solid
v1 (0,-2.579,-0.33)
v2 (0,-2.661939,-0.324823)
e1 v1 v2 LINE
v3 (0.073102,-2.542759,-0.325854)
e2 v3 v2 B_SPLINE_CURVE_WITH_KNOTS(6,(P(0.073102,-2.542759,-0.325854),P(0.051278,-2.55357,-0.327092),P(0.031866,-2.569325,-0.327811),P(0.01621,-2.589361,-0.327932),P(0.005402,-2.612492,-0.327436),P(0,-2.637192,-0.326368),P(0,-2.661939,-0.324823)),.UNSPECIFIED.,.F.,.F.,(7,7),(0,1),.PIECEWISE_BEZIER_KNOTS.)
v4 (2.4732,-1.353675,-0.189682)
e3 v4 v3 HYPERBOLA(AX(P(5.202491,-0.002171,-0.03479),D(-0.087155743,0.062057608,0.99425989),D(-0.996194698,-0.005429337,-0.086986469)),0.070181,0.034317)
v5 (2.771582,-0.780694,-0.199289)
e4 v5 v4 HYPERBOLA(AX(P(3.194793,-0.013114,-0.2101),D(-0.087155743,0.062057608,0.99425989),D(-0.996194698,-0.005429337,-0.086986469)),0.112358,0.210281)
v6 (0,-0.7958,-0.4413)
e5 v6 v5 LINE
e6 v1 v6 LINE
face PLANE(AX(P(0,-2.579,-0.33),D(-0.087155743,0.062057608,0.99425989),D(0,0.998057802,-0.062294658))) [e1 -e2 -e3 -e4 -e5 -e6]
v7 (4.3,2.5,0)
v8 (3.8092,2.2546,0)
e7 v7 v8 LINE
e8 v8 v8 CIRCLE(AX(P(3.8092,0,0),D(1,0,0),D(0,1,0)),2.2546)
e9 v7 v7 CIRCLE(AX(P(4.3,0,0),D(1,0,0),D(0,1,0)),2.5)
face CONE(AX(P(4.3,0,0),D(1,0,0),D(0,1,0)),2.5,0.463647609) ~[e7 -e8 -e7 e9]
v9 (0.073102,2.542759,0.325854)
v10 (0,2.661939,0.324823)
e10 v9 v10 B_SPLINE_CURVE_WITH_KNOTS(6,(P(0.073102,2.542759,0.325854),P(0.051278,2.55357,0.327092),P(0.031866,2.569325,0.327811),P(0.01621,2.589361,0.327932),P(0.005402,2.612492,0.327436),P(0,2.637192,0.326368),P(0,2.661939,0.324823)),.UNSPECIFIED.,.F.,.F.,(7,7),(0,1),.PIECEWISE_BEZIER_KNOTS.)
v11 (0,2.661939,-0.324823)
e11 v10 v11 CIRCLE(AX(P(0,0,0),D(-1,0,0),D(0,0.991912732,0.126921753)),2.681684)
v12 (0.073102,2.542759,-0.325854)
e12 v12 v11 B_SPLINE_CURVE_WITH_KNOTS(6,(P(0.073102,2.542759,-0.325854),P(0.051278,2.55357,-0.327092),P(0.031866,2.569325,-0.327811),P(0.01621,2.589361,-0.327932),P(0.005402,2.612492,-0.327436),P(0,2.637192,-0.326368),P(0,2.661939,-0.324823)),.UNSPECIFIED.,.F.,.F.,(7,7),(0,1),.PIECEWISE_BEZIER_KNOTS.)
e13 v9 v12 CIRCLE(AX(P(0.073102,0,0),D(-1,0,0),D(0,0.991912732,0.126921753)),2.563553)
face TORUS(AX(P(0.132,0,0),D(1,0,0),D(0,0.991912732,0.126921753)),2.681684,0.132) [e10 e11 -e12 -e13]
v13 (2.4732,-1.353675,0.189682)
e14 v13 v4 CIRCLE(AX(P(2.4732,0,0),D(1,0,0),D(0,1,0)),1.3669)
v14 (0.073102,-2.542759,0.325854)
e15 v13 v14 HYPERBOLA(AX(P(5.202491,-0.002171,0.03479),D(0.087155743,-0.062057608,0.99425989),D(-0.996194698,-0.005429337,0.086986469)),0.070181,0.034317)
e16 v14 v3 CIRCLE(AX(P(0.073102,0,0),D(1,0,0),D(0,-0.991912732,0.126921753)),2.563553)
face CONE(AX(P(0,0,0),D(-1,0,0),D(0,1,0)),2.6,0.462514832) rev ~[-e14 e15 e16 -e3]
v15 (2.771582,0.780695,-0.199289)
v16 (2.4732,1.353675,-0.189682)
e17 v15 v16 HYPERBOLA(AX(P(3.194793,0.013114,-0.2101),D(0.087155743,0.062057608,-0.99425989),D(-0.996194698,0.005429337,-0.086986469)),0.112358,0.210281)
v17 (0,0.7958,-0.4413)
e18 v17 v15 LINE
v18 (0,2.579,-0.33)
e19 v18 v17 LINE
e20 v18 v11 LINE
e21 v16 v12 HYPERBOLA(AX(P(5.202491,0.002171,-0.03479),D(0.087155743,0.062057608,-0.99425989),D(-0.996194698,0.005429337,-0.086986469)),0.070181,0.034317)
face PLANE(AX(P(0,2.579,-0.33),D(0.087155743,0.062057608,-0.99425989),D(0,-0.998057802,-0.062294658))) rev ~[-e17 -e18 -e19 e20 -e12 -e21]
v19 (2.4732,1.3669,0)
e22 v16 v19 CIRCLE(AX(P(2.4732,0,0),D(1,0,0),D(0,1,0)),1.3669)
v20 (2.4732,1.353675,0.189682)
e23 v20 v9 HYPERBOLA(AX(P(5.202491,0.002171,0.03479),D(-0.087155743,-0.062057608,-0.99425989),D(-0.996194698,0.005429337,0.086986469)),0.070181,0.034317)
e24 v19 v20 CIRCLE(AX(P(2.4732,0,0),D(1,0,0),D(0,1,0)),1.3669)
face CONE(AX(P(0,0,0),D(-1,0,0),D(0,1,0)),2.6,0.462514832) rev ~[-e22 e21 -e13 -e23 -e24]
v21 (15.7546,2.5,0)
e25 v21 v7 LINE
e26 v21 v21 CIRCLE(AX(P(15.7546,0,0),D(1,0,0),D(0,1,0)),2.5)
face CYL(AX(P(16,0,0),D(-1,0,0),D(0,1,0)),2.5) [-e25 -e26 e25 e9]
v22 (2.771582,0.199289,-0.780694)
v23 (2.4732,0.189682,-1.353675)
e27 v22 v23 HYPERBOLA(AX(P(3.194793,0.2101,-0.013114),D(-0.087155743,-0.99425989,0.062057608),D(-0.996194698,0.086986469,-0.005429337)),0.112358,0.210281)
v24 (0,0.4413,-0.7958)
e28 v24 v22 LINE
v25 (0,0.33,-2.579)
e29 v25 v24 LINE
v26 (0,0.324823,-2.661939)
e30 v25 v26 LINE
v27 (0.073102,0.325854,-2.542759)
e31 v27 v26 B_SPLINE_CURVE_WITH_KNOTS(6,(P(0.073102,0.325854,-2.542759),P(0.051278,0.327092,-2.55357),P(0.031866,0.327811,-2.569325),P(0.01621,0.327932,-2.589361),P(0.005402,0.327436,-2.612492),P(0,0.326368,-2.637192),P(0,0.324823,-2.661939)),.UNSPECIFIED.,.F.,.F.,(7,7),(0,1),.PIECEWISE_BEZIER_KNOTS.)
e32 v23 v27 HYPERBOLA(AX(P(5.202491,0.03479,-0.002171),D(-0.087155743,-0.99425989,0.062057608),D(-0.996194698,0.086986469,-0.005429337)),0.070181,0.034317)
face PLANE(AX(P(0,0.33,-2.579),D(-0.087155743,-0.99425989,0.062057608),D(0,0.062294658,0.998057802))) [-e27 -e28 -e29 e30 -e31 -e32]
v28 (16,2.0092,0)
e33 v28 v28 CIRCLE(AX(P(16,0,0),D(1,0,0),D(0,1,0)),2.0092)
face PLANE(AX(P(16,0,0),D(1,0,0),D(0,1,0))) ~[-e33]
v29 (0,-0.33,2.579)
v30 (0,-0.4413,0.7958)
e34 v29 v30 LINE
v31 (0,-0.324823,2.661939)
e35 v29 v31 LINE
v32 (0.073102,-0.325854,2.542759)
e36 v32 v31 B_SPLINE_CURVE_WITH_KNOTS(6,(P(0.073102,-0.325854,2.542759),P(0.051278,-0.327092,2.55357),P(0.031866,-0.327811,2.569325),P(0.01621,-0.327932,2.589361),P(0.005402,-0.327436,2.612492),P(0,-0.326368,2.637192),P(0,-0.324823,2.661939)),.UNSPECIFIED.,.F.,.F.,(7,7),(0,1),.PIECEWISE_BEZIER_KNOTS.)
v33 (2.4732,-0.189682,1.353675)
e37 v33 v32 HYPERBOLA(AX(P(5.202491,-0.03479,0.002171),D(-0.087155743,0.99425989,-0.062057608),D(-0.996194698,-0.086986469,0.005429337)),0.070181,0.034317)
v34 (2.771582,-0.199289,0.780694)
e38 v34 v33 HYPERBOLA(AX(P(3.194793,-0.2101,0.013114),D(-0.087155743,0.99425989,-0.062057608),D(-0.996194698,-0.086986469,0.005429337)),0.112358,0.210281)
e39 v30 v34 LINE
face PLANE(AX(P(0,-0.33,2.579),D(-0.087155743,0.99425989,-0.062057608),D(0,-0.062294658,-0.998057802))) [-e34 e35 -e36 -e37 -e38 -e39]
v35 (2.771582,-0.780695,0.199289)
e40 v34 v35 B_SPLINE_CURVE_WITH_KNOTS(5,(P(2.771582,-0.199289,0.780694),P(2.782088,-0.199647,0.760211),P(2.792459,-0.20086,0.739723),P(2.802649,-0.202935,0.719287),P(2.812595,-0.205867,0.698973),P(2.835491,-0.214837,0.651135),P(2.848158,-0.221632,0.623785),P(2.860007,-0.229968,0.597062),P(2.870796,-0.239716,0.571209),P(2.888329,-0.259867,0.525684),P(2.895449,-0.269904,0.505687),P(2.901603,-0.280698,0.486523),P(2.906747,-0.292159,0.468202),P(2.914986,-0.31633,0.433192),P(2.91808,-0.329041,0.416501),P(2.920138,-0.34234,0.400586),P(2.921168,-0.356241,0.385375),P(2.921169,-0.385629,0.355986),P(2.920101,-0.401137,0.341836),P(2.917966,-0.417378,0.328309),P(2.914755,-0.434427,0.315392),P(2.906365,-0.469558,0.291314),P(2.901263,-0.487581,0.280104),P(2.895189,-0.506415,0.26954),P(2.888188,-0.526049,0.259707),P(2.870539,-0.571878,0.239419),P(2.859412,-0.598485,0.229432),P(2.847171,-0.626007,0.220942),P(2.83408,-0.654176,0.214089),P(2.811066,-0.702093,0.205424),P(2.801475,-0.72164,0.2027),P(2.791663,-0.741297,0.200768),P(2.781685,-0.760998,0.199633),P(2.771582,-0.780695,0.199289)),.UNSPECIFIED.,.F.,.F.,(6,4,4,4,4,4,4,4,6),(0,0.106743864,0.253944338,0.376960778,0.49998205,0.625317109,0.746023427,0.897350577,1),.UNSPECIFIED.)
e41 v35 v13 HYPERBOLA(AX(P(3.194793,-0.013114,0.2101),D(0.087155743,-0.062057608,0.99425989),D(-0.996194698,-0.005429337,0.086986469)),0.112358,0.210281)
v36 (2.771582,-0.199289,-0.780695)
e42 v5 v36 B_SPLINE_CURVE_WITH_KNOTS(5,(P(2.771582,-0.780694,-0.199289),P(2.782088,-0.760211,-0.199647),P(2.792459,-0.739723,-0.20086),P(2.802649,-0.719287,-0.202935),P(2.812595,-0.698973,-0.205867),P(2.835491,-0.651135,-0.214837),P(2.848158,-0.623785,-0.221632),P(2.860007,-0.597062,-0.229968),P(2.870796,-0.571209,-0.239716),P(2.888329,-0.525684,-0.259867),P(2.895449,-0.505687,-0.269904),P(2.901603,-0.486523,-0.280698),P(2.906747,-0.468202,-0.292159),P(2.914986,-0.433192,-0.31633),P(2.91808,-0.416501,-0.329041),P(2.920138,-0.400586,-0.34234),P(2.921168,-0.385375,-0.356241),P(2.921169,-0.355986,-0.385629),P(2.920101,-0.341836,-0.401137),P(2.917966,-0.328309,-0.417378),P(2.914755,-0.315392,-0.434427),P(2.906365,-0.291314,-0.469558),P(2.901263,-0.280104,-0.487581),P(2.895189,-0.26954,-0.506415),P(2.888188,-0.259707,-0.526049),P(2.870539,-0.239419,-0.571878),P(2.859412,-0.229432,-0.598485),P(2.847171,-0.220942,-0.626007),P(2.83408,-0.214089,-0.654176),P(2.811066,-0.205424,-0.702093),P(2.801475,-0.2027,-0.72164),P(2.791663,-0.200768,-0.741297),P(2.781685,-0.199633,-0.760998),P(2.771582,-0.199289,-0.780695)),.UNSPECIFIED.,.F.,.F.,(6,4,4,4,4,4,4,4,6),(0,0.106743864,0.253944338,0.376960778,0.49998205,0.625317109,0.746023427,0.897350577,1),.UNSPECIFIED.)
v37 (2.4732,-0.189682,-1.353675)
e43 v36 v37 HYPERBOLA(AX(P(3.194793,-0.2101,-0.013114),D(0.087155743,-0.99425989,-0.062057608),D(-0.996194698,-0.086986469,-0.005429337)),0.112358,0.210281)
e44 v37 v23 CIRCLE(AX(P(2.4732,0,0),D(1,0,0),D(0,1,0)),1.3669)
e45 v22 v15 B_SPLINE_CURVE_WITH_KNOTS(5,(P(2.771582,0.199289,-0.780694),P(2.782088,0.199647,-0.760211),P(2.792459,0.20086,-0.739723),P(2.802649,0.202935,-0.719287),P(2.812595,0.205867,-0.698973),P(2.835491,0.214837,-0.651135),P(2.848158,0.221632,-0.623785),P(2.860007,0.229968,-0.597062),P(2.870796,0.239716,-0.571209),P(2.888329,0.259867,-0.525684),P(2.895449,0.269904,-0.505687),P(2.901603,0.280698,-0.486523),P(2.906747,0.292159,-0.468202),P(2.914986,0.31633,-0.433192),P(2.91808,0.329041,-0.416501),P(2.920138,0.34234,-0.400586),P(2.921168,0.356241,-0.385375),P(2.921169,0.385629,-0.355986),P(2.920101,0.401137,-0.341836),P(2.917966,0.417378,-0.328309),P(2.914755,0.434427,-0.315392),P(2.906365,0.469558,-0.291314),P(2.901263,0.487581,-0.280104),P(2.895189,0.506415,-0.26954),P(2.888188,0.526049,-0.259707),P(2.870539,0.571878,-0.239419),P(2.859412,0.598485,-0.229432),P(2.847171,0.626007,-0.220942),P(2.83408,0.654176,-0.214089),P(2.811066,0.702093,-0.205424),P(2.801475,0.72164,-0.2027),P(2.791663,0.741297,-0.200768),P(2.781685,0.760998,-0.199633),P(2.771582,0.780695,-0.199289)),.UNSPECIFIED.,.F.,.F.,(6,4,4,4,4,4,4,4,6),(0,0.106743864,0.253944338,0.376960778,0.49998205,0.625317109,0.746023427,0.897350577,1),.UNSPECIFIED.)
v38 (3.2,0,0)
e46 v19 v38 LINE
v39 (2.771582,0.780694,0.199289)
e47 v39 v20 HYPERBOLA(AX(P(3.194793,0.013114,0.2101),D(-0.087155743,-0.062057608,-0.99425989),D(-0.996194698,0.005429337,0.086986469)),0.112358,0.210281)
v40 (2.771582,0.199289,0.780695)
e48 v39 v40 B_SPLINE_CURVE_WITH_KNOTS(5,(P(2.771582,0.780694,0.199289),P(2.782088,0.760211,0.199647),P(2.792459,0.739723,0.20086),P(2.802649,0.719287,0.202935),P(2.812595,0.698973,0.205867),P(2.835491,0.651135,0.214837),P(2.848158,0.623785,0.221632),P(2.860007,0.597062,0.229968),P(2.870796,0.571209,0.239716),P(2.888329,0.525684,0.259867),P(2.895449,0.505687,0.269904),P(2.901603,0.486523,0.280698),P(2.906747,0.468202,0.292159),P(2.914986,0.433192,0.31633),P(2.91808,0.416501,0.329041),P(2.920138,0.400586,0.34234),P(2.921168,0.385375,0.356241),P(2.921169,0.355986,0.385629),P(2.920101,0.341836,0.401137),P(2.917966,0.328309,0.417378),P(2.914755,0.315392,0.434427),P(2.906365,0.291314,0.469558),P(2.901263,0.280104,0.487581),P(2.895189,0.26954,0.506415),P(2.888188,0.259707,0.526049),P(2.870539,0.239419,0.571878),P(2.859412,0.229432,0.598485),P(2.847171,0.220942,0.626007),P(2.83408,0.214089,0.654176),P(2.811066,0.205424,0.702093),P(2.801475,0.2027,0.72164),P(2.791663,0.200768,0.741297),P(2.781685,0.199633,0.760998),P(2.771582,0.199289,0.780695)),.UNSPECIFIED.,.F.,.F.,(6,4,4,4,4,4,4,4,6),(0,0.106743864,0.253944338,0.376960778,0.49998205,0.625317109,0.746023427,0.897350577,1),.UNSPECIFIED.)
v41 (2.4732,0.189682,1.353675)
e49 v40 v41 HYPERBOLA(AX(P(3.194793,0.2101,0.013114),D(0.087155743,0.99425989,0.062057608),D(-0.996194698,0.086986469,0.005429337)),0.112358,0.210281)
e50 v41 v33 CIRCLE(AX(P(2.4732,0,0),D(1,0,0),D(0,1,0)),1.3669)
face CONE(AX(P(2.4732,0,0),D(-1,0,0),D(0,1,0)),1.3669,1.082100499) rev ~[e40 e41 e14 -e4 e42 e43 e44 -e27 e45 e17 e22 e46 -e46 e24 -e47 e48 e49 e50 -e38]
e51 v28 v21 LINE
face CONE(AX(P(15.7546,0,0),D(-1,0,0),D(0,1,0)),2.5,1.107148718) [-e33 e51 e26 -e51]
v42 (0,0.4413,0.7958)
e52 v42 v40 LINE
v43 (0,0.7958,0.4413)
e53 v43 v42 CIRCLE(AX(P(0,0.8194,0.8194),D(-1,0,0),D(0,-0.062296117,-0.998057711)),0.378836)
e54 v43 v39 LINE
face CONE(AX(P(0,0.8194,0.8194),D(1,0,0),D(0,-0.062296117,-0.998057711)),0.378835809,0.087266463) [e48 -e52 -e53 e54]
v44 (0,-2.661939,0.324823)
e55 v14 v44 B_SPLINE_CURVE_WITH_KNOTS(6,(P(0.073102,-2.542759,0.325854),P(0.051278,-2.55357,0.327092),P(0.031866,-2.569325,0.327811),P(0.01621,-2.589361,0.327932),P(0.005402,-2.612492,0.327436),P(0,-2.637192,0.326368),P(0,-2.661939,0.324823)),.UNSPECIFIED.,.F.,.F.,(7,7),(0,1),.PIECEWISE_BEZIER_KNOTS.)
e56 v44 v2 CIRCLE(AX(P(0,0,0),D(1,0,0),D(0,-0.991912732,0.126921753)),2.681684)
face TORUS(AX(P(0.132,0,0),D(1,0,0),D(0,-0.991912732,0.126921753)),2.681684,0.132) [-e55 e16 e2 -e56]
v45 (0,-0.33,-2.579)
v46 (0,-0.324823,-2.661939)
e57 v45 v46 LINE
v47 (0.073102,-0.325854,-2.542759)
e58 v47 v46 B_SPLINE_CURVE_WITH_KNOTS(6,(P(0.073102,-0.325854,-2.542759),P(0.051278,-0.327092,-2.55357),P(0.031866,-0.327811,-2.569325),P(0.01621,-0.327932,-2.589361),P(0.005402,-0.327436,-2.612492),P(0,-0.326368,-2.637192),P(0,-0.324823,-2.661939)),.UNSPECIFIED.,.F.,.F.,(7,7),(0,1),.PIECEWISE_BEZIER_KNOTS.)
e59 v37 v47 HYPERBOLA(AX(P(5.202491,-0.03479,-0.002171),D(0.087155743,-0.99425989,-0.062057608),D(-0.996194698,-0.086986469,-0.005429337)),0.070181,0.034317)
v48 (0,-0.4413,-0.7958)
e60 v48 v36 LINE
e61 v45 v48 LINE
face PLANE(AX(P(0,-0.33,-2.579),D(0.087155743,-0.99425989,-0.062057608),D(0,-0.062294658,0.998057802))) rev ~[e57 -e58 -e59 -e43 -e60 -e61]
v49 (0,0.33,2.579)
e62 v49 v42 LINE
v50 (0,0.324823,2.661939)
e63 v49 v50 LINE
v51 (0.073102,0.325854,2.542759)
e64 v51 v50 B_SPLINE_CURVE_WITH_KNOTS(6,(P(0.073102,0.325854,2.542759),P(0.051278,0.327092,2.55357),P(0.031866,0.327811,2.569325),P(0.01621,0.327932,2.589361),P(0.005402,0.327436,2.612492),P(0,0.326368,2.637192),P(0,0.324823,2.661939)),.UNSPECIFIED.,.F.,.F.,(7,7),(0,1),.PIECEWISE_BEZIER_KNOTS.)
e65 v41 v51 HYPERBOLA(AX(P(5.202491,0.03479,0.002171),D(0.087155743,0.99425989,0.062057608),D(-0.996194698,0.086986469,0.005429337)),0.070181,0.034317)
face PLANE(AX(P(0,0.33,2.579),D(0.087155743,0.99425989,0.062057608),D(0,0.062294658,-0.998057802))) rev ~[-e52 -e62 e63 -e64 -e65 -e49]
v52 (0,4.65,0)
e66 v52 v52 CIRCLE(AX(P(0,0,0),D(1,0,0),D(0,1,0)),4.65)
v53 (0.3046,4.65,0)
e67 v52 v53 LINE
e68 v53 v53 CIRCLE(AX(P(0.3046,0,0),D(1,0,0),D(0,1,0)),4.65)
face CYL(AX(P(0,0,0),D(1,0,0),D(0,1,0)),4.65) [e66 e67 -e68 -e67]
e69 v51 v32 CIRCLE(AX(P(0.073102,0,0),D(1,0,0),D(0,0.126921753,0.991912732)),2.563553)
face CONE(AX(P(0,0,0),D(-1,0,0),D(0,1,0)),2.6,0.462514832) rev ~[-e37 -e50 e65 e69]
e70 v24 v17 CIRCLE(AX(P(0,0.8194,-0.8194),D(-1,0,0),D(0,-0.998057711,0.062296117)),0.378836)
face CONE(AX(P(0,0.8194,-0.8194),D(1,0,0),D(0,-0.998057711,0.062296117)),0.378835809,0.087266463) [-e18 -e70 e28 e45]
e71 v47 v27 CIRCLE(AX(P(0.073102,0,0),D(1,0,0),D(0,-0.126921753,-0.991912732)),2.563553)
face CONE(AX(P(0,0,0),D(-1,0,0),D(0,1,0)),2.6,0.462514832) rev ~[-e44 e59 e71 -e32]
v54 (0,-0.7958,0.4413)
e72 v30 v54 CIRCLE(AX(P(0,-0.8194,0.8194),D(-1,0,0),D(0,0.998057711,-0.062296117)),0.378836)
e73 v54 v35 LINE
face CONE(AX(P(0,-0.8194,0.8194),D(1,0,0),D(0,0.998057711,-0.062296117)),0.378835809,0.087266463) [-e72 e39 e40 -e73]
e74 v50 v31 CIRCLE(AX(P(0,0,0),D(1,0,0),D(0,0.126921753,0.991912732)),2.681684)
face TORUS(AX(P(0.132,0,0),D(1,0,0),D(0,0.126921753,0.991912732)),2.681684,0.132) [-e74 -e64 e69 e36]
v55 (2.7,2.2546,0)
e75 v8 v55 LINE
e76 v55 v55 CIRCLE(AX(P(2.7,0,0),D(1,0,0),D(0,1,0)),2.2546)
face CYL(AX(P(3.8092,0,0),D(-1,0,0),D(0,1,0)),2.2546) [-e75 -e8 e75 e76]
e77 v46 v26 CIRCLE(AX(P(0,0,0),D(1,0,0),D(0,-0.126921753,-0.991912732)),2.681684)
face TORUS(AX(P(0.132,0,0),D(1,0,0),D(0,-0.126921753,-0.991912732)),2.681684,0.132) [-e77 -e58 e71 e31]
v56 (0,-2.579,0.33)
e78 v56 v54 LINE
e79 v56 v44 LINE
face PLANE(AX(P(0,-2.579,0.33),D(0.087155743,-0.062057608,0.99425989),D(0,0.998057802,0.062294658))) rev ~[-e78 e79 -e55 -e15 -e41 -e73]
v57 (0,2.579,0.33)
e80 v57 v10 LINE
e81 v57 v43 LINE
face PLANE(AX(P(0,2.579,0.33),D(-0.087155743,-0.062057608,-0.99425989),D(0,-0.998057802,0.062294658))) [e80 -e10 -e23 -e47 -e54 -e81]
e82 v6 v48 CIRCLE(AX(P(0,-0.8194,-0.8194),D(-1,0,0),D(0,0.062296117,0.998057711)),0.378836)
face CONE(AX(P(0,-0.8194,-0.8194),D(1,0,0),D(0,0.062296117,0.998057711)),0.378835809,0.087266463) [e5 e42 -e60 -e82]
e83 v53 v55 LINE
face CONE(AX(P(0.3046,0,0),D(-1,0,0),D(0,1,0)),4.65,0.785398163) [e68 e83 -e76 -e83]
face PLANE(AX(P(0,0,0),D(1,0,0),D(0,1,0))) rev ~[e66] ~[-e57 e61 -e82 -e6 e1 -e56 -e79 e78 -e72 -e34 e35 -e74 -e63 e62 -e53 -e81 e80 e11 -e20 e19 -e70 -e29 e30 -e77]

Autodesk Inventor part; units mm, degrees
ref_plane "YZ Plane" through (0, 0, 0) normal (1, 0, 0) x (0, 1, 0)
ref_plane "XZ Plane" through (0, 0, 0) normal (0, 1, 0) x (-1, 0, 0)
sketch "Sketch1" plane through (0, 0, 0) normal (0, 0, 1) x (1, 0, 0)
  line L0 (3.2, 0) -> (16, 0)
  line L1 (16, 0) -> (16, 2.5)
  line L2 (16, 2.5) -> (4.3, 2.5)
  line L3 (4.3, 2.5) -> (3.8092, 2.2546)
  line L4 (3.8092, 2.2546) -> (2.7, 2.2546)
  line L5 (0, 4.65) -> (0, 2.6)
  line L6 (0, 2.6) -> (2.4732, 1.3669)
  line L7 (2.4732, 1.3669) -> (3.2, 0)
  line L8 (-3.2, 0) -> (19.2, 0) projected
  line L9 (0, -0.93) -> (0, 5.58) projected
  line L10 (0, 4.65) -> (0.3046, 4.65)
  line L11 (0.3046, 4.65) -> (2.7, 2.2546)
  line L12 (4.3, 2.5) -> (2.4546, 2.5) construction
  dimension "d1" = 11.7
  dimension "d2" = 5
  dimension "d3" = 4.5092
  dimension "d4" = 5.2
  dimension "d5" = 26.5
  dimension "d6" = 62
  dimension "d7" = 3.2
  dimension "d8" = 0.4908
  dimension "d12" = 9.3
  dimension "d13" = 45
  dimension "d15" = 16
  dimension "d24" = 2.7
revolve "Body" add sketch "Sketch1" angle 360 about axis through (3.2, 0, 0) along (1, 0, 0) contours L7 L6 L5 L10 L11 L4 L3 L2 L1 L0
sketch "Sketch2" plane through (0, 0, 0) normal (-1, 0, 0) x (0, 0, 1)
  line L0 (0, 2.6) -> (0, 0) construction
  line L1 (0, 0) -> (2.6, 0) construction
  arc A0 (0.78, 0) -> (0, 0.78) centre (0, 0) ccw construction
  arc A1 (0.91, 0) -> (0, 0.91) centre (0, 0) ccw construction
  arc A2 (2.579, 0.33) -> (0.33, 2.579) centre (0, 0) ccw
  line L2 (0, 0) -> (1.8385, 1.8385) construction
  line L3 (0.33, 2.579) -> (0.4413, 0.7958)
  line L4 (2.579, 0.33) -> (0.7958, 0.4413)
  arc A3 (0.33, 2.579) -> (0, 2.6) centre (0, 0) ccw
  arc A4 (2.6, 0) -> (2.579, 0.33) centre (0, 0) ccw
  line L5 (0, -6.51) -> (0, 6.51) projected
  line L6 (-6.51, 0) -> (6.51, 0) projected
  arc A5 (0.33, -2.579) -> (2.579, -0.33) centre (0, 0) ccw
  line L7 (0.33, -2.579) -> (0.4413, -0.7958)
  line L8 (2.579, -0.33) -> (0.7958, -0.4413)
  arc A6 (0, -2.6) -> (0.33, -2.579) centre (0, 0) ccw
  arc A7 (2.579, -0.33) -> (2.6, 0) centre (0, 0) ccw
  arc A8 (-0.33, 2.579) -> (-2.579, 0.33) centre (0, 0) ccw
  line L9 (-0.33, 2.579) -> (-0.4413, 0.7958)
  line L10 (-2.579, 0.33) -> (-0.7958, 0.4413)
  arc A9 (0, 2.6) -> (-0.33, 2.579) centre (0, 0) ccw
  arc A10 (-2.579, 0.33) -> (-2.6, 0) centre (0, 0) ccw
  arc A11 (-0.33, -2.579) -> (0, -2.6) centre (0, 0) ccw
  arc A12 (-2.579, -0.33) -> (-0.33, -2.579) centre (0, 0) ccw
  arc A13 (-2.6, 0) -> (-2.579, -0.33) centre (0, 0) ccw
  line L11 (-2.579, -0.33) -> (-0.7958, -0.4413)
  line L12 (-0.33, -2.579) -> (-0.4413, -0.7958)
  arc A14 (0.4413, 0.7958) -> (0.7958, 0.4413) centre (0.8194, 0.8194) ccw
  arc A15 (0.7958, -0.4413) -> (0.4413, -0.7958) centre (0.8194, -0.8194) ccw
  arc A16 (-0.7958, 0.4413) -> (-0.4413, 0.7958) centre (-0.8194, 0.8194) ccw
  arc A17 (-0.4413, -0.7958) -> (-0.7958, -0.4413) centre (-0.8194, -0.8194) ccw
  point P0 (1.8385, -1.8385)
  point P1 (-1.8385, 1.8385)
  point P2 (-1.8385, -1.8385)
  dimension "d17" = 1.56
  dimension "d18" = 1.82
  dimension "d19" = 5.2
  dimension "d20" = 45
  dimension "d21" = 0.33
extrude "Slot" add sketch "Sketch2" against normal up to next draft 5 contours L4 A14 L3 A2 | A5 L7 A15 L8 | L9 A16 L10 A8 | A12 L11 A17 L12
fillet "Fillet1" radius 0.132 4 edges at (0, 2.6, 0) (0, 0, -2.6) (0, -2.6, 0) (0, 0, 2.6)
thread "Thread" size "M5x0.8" class "6g" standard "ISO Metric profile" length 11.7
chamfer "Chamfer1" distance 0.4908 distance2 0.2454 1 edges at (16, -2.5, 0) measured on face at (16, 0.2278, 0.5045)
ref_plane "Work Plane2" through (3.35, 0, 0) normal (0, 0, -1) x (1, 0, 0)
equation "\"d17\" = 0.3 * SDM"
equation "\"d18\" = 0.35 * SDM"
equation "\"d19\" = SDM"
equation "\"d21\" = 0.5 * SBR"
equation "\"d1\" = GEL"
equation "\"d2\" = GD"
equation "\"d3\" = BDM"
equation "\"d4\" = SDM"
equation "\"d7\" = INTI"
equation "\"d8\" = GAL"
equation "\"d12\" = KOD"
equation "\"d13\" = 0.5 * SEWI"
equation "\"d15\" = NLG"
equation "\"d24\" = KOH"
equation "\"d23\" = 0.2 * SBR"
equation "\"d10\" = GEL"
equation "\"d25\" = -0.5 * SPD + 0.5 * GD"
equation "\"d26\" = 0.5 * GAL"
equation "\"NLG\" = 16"
equation "\"GEL\" = 11.7"
equation "\"GAL\" = 0.61345 * PTC"
equation "\"SPD\" = NND - 1.2269 * PTC"
equation "\"KOD\" = 9.3"
equation "\"KOH\" = 2.7"
equation "\"SBR\" = 0.66"
equation "\"INTI\" = 3.2"
equation "\"SDM\" = 5.2"
equation "\"GD\" = NND"
equation "\"BDM\" = NND - GAL"
equation "\"SEWI\" = 90deg"
equation "\"d9\" = SDM"
equation "\"GUL\" = 0.61345 * PTC"
equation "\"TOA\" = 30deg"
equation "\"EPV\" = 5.2"
equation "\"THREADDIA\" = 5"
equation "\"PTC\" = 0.8"
equation "\"NND\" = 5"
equation "\"GD1\" = THREADDIA - 1.2269 * PTC"
properties part number "ISO 7046-1 - M5 x 16 - 4.8 - H" material "Steel"
